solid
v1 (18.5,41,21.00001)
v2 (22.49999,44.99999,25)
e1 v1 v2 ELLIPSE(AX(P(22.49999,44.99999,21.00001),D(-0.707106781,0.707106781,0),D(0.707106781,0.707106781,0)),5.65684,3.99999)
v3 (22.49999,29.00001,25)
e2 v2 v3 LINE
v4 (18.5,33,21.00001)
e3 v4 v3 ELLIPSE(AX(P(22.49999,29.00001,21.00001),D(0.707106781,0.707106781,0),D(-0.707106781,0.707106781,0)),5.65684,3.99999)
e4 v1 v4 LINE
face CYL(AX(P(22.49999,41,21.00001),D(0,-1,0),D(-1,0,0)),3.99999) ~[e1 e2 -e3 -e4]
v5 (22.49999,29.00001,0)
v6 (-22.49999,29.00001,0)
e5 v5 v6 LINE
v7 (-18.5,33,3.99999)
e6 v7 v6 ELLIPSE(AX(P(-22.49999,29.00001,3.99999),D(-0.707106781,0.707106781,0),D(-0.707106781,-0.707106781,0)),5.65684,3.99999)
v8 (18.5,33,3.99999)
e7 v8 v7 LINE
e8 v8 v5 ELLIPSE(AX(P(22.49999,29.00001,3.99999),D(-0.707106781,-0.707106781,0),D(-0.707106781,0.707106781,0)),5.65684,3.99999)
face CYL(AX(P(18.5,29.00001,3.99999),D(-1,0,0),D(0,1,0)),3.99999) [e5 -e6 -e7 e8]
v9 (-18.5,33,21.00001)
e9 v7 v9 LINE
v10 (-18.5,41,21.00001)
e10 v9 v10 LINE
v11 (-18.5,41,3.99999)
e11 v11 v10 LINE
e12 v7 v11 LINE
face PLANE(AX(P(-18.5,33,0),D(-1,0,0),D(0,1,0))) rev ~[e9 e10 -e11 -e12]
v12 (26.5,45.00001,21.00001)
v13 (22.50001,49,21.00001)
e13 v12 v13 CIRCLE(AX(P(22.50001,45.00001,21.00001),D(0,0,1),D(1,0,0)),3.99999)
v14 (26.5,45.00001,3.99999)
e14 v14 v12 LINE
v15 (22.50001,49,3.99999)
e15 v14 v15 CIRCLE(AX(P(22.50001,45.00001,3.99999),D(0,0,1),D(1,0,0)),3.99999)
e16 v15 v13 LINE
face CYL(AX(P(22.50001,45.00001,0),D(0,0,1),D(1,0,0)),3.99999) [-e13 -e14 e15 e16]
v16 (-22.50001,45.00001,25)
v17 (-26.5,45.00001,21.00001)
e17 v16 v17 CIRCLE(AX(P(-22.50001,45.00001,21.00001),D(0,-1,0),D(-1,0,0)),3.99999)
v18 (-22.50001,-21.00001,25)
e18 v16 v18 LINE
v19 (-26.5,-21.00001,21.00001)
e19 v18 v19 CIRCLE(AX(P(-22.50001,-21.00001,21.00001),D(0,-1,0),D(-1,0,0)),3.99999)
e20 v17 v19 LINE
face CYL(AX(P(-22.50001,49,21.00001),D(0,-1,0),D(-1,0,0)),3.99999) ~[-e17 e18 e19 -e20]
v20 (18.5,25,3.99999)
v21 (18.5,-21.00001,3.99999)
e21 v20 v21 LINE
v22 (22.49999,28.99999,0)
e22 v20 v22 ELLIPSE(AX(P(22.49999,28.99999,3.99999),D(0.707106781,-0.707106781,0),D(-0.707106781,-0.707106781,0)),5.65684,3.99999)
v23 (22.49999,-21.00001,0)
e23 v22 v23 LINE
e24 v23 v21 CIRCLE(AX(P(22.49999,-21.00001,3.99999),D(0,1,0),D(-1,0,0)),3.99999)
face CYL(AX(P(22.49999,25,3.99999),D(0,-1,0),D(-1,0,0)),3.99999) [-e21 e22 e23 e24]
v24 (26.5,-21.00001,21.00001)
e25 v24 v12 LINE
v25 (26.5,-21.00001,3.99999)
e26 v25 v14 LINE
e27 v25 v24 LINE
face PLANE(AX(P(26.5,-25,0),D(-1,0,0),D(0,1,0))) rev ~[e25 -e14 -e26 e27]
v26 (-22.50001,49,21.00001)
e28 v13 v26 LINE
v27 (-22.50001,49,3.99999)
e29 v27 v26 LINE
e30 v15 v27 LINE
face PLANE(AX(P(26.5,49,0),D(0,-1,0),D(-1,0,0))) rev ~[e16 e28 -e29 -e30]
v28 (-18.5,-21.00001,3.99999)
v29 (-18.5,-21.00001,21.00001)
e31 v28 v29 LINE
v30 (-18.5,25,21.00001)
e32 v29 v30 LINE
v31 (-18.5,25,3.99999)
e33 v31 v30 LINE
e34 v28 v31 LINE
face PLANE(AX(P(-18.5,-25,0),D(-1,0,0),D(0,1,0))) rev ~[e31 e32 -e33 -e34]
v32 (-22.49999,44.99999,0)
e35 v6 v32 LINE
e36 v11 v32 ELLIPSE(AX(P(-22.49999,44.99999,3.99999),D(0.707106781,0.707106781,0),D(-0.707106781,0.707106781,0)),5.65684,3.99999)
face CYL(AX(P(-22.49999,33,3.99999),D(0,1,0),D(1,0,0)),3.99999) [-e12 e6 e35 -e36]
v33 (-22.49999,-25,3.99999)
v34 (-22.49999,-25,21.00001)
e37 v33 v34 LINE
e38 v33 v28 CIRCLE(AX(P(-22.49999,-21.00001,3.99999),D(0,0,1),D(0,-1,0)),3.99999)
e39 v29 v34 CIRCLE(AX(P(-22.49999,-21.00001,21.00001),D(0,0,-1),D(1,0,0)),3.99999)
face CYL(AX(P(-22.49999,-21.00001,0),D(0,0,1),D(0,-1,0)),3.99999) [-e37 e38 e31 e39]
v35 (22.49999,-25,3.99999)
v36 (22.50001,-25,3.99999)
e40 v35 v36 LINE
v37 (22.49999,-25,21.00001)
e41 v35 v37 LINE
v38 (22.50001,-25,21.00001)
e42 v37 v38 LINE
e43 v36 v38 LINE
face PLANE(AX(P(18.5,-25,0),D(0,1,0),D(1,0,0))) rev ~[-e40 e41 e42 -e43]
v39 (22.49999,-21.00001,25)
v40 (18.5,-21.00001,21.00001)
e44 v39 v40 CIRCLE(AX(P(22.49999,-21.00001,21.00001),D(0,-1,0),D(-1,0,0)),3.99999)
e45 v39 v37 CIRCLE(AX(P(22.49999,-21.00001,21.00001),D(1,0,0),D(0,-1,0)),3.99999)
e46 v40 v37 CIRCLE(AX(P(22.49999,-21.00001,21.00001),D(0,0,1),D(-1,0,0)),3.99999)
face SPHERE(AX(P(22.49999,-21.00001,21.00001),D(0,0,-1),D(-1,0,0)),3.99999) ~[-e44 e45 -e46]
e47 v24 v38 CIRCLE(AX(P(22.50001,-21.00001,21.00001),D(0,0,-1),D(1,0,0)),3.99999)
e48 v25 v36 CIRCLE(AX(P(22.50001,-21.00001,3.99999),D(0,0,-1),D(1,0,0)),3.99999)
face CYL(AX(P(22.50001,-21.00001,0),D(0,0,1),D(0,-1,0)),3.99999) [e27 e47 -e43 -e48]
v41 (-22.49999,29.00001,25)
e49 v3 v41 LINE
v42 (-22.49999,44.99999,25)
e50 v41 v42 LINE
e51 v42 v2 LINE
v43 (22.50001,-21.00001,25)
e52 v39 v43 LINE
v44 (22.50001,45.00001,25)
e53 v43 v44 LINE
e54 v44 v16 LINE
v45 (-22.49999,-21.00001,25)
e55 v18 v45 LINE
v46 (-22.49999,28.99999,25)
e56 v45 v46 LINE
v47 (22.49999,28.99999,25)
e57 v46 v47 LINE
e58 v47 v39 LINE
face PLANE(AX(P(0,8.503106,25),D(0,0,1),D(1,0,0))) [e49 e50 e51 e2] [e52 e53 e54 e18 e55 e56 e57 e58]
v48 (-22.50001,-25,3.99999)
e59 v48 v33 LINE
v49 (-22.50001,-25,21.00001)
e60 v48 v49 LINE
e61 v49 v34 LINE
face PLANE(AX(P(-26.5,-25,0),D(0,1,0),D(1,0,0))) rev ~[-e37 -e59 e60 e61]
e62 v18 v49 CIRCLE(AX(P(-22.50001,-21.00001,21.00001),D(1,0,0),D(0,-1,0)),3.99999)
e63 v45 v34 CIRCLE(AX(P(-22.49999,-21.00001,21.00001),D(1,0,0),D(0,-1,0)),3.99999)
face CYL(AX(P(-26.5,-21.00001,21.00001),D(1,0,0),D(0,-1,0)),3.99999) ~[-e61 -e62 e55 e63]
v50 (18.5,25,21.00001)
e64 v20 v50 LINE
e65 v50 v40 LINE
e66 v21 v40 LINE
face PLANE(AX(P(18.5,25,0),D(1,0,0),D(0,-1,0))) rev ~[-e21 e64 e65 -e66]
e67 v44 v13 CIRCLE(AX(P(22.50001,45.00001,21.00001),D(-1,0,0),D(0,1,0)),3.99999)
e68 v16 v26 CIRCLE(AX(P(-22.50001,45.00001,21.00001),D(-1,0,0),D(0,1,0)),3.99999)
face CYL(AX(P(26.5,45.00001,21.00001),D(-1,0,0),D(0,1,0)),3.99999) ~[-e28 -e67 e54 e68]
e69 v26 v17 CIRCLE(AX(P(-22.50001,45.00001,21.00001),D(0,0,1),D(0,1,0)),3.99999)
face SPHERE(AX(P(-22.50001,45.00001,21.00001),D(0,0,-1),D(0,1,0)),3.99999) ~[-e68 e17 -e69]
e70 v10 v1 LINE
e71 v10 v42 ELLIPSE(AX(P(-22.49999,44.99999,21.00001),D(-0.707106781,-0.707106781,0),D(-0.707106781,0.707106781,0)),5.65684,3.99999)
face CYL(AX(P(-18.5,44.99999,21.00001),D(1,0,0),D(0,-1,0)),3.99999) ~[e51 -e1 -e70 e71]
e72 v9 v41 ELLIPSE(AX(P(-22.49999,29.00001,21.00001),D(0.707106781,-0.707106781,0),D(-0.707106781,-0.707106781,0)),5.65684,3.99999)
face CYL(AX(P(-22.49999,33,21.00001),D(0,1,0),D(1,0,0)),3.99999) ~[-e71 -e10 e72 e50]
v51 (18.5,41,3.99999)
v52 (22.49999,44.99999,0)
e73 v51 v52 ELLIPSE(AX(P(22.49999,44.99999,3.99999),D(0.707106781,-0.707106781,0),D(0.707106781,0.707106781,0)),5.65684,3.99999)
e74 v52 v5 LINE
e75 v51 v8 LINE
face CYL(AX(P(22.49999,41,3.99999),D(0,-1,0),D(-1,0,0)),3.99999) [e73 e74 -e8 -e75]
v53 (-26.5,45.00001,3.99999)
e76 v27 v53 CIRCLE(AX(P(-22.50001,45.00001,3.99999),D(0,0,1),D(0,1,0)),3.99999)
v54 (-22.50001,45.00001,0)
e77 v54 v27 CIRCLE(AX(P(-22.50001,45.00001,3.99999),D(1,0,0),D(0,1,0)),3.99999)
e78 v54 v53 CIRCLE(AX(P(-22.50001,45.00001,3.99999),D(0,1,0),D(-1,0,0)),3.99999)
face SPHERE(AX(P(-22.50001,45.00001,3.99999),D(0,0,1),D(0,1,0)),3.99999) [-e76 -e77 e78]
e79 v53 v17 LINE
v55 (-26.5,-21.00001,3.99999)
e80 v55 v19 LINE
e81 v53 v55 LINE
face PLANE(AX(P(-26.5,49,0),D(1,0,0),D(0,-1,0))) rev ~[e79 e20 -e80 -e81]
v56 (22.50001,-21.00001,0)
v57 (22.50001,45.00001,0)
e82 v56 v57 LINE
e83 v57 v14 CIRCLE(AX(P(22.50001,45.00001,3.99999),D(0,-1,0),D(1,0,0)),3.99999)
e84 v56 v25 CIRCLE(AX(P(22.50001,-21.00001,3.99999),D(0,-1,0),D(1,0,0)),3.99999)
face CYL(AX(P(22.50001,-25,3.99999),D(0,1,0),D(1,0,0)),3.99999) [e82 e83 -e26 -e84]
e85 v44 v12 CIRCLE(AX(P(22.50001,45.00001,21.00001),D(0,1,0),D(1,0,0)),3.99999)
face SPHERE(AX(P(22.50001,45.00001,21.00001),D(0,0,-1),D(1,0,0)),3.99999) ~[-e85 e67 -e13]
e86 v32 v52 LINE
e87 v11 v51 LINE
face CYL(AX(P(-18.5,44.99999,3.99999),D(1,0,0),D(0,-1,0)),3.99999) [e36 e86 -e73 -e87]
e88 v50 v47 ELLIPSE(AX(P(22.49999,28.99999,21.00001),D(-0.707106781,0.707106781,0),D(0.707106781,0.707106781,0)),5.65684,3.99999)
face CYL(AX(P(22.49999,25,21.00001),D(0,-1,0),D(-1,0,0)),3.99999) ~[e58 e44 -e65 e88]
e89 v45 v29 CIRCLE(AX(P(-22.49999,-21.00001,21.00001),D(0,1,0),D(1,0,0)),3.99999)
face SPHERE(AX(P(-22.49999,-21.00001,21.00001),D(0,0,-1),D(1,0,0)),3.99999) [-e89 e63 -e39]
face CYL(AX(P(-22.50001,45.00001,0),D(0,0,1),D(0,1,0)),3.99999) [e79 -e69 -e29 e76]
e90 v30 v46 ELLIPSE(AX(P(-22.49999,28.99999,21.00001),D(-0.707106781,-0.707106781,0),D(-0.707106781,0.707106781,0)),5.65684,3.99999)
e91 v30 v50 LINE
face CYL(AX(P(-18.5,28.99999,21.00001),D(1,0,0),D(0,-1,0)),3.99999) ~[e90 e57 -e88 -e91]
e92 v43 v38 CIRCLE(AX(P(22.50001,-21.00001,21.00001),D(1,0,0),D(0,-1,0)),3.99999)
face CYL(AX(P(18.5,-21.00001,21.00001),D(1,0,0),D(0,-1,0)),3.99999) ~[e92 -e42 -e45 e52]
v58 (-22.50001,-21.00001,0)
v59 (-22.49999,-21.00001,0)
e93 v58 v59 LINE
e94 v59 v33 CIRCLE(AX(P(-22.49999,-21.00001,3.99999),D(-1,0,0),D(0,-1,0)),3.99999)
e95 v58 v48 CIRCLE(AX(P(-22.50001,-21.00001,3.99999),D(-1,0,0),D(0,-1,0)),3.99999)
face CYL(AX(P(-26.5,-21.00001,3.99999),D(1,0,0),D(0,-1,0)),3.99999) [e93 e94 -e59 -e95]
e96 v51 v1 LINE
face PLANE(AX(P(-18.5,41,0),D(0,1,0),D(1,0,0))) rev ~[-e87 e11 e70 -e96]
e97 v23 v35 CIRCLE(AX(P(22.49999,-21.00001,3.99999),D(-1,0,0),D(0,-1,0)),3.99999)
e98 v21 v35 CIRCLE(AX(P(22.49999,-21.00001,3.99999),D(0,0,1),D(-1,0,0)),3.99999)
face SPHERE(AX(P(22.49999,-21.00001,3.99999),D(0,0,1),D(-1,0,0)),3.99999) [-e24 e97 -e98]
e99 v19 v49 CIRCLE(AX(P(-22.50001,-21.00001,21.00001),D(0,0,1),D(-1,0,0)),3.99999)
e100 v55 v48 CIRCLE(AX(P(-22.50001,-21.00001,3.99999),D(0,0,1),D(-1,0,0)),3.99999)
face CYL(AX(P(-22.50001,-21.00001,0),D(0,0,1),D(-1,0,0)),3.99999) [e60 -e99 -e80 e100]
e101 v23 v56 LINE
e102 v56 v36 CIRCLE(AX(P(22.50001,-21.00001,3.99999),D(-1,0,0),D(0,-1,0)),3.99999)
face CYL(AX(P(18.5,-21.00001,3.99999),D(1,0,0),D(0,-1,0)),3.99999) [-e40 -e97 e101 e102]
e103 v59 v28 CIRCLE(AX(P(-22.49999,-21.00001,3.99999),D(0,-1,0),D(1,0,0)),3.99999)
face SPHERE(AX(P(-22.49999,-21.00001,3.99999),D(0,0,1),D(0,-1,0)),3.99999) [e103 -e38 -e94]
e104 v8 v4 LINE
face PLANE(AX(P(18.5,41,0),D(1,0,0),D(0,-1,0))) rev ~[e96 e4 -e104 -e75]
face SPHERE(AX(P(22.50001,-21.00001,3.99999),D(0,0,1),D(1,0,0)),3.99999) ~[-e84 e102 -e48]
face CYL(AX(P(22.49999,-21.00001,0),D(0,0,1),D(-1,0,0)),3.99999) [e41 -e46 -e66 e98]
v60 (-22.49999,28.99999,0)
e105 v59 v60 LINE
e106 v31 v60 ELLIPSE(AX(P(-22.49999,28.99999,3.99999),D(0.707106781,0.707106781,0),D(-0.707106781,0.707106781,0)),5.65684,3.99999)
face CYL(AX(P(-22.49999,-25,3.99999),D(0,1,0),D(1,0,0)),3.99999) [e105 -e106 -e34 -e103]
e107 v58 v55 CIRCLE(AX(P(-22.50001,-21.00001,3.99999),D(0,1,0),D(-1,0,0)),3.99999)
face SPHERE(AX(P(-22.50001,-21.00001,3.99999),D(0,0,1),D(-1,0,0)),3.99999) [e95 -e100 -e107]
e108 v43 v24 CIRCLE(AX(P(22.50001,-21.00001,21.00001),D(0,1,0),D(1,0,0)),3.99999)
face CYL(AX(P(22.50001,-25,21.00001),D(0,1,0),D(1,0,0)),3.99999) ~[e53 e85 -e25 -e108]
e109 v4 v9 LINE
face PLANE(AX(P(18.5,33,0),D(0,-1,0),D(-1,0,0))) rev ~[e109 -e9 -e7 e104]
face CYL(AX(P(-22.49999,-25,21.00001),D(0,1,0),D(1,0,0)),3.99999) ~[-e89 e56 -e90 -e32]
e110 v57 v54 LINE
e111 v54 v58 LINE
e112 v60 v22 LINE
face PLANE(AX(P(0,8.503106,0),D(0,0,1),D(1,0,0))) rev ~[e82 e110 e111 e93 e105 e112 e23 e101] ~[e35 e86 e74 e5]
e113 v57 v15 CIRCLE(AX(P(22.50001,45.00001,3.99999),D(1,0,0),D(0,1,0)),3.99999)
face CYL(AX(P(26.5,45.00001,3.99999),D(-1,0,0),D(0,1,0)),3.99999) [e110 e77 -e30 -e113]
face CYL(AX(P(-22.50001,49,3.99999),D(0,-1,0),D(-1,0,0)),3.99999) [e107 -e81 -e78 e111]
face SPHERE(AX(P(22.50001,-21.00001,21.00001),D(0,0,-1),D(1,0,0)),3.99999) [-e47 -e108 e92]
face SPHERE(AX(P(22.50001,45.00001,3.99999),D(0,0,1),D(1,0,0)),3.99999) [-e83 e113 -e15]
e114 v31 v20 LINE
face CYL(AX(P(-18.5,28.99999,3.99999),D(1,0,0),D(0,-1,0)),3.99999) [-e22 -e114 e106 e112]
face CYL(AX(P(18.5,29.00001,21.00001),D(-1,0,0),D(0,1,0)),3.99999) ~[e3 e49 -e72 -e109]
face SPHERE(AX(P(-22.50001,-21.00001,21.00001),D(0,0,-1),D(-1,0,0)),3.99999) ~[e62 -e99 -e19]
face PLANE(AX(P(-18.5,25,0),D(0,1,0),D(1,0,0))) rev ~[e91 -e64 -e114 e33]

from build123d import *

# Parameters (mm, degrees)
F1_DEPTH = 25
F2_R     = 3.99999


# Not quite as in the source:
# - a fillet or chamfer is up to 0.001 mm smaller than in the source, because OpenCascade refuses the exact size


with BuildPart() as f1:
    # F0 (on Top) → F1 (new body)
    with BuildSketch(Plane.XY):
        Polygon((18.5, 25), (18.5, -25), (26.5, -25), (26.5, 33), (18.5, 33), (-18.5, 33), (-26.5, 33), (-26.5, -25), (-18.5, -25), (-18.5, 25), align=None)
        Polygon((18.5, 33), (26.5, 33), (26.5, 49), (-26.5, 49), (-26.5, 33), (-18.5, 33), (-18.5, 41), (18.5, 41), align=None)
    extrude(amount=F1_DEPTH)

    # F2 (radius 4 in the source; OpenCascade refuses exactly that, so slightly less here)
    f2_edges = [f1.edges().sort_by_distance(p)[0] for p in [
        (-26.5, 49, 12.5),
        (26.5, 49, 12.5),
        (-18.5, -25, 12.5),
        (18.5, -25, 12.5),
        (-26.5, -25, 12.5),
        (26.5, -25, 12.5),
        (0, 33, 25),
        (-18.5, 37, 25),
        (0, 41, 25),
        (18.5, 37, 25),
        (-18.5, 0, 25),
        (0, 25, 25),
        (26.5, 12, 0),
        (26.5, 12, 25),
        (18.5, 0, 0),
        (22.5, -25, 0),
        (0, 49, 0),
        (-26.5, 12, 0),
        (-22.5, -25, 0),
        (-18.5, 0, 0),
        (0, 25, 0),
        (0, 33, 0),
        (-18.5, 37, 0),
        (0, 41, 0),
        (18.5, 37, 0),
        (18.5, 0, 25),
        (22.5, -25, 25),
        (0, 49, 25),
        (-26.5, 12, 25),
        (-22.5, -25, 25),
    ]]
    fillet(f2_edges, radius=F2_R)


solid = f1.part
